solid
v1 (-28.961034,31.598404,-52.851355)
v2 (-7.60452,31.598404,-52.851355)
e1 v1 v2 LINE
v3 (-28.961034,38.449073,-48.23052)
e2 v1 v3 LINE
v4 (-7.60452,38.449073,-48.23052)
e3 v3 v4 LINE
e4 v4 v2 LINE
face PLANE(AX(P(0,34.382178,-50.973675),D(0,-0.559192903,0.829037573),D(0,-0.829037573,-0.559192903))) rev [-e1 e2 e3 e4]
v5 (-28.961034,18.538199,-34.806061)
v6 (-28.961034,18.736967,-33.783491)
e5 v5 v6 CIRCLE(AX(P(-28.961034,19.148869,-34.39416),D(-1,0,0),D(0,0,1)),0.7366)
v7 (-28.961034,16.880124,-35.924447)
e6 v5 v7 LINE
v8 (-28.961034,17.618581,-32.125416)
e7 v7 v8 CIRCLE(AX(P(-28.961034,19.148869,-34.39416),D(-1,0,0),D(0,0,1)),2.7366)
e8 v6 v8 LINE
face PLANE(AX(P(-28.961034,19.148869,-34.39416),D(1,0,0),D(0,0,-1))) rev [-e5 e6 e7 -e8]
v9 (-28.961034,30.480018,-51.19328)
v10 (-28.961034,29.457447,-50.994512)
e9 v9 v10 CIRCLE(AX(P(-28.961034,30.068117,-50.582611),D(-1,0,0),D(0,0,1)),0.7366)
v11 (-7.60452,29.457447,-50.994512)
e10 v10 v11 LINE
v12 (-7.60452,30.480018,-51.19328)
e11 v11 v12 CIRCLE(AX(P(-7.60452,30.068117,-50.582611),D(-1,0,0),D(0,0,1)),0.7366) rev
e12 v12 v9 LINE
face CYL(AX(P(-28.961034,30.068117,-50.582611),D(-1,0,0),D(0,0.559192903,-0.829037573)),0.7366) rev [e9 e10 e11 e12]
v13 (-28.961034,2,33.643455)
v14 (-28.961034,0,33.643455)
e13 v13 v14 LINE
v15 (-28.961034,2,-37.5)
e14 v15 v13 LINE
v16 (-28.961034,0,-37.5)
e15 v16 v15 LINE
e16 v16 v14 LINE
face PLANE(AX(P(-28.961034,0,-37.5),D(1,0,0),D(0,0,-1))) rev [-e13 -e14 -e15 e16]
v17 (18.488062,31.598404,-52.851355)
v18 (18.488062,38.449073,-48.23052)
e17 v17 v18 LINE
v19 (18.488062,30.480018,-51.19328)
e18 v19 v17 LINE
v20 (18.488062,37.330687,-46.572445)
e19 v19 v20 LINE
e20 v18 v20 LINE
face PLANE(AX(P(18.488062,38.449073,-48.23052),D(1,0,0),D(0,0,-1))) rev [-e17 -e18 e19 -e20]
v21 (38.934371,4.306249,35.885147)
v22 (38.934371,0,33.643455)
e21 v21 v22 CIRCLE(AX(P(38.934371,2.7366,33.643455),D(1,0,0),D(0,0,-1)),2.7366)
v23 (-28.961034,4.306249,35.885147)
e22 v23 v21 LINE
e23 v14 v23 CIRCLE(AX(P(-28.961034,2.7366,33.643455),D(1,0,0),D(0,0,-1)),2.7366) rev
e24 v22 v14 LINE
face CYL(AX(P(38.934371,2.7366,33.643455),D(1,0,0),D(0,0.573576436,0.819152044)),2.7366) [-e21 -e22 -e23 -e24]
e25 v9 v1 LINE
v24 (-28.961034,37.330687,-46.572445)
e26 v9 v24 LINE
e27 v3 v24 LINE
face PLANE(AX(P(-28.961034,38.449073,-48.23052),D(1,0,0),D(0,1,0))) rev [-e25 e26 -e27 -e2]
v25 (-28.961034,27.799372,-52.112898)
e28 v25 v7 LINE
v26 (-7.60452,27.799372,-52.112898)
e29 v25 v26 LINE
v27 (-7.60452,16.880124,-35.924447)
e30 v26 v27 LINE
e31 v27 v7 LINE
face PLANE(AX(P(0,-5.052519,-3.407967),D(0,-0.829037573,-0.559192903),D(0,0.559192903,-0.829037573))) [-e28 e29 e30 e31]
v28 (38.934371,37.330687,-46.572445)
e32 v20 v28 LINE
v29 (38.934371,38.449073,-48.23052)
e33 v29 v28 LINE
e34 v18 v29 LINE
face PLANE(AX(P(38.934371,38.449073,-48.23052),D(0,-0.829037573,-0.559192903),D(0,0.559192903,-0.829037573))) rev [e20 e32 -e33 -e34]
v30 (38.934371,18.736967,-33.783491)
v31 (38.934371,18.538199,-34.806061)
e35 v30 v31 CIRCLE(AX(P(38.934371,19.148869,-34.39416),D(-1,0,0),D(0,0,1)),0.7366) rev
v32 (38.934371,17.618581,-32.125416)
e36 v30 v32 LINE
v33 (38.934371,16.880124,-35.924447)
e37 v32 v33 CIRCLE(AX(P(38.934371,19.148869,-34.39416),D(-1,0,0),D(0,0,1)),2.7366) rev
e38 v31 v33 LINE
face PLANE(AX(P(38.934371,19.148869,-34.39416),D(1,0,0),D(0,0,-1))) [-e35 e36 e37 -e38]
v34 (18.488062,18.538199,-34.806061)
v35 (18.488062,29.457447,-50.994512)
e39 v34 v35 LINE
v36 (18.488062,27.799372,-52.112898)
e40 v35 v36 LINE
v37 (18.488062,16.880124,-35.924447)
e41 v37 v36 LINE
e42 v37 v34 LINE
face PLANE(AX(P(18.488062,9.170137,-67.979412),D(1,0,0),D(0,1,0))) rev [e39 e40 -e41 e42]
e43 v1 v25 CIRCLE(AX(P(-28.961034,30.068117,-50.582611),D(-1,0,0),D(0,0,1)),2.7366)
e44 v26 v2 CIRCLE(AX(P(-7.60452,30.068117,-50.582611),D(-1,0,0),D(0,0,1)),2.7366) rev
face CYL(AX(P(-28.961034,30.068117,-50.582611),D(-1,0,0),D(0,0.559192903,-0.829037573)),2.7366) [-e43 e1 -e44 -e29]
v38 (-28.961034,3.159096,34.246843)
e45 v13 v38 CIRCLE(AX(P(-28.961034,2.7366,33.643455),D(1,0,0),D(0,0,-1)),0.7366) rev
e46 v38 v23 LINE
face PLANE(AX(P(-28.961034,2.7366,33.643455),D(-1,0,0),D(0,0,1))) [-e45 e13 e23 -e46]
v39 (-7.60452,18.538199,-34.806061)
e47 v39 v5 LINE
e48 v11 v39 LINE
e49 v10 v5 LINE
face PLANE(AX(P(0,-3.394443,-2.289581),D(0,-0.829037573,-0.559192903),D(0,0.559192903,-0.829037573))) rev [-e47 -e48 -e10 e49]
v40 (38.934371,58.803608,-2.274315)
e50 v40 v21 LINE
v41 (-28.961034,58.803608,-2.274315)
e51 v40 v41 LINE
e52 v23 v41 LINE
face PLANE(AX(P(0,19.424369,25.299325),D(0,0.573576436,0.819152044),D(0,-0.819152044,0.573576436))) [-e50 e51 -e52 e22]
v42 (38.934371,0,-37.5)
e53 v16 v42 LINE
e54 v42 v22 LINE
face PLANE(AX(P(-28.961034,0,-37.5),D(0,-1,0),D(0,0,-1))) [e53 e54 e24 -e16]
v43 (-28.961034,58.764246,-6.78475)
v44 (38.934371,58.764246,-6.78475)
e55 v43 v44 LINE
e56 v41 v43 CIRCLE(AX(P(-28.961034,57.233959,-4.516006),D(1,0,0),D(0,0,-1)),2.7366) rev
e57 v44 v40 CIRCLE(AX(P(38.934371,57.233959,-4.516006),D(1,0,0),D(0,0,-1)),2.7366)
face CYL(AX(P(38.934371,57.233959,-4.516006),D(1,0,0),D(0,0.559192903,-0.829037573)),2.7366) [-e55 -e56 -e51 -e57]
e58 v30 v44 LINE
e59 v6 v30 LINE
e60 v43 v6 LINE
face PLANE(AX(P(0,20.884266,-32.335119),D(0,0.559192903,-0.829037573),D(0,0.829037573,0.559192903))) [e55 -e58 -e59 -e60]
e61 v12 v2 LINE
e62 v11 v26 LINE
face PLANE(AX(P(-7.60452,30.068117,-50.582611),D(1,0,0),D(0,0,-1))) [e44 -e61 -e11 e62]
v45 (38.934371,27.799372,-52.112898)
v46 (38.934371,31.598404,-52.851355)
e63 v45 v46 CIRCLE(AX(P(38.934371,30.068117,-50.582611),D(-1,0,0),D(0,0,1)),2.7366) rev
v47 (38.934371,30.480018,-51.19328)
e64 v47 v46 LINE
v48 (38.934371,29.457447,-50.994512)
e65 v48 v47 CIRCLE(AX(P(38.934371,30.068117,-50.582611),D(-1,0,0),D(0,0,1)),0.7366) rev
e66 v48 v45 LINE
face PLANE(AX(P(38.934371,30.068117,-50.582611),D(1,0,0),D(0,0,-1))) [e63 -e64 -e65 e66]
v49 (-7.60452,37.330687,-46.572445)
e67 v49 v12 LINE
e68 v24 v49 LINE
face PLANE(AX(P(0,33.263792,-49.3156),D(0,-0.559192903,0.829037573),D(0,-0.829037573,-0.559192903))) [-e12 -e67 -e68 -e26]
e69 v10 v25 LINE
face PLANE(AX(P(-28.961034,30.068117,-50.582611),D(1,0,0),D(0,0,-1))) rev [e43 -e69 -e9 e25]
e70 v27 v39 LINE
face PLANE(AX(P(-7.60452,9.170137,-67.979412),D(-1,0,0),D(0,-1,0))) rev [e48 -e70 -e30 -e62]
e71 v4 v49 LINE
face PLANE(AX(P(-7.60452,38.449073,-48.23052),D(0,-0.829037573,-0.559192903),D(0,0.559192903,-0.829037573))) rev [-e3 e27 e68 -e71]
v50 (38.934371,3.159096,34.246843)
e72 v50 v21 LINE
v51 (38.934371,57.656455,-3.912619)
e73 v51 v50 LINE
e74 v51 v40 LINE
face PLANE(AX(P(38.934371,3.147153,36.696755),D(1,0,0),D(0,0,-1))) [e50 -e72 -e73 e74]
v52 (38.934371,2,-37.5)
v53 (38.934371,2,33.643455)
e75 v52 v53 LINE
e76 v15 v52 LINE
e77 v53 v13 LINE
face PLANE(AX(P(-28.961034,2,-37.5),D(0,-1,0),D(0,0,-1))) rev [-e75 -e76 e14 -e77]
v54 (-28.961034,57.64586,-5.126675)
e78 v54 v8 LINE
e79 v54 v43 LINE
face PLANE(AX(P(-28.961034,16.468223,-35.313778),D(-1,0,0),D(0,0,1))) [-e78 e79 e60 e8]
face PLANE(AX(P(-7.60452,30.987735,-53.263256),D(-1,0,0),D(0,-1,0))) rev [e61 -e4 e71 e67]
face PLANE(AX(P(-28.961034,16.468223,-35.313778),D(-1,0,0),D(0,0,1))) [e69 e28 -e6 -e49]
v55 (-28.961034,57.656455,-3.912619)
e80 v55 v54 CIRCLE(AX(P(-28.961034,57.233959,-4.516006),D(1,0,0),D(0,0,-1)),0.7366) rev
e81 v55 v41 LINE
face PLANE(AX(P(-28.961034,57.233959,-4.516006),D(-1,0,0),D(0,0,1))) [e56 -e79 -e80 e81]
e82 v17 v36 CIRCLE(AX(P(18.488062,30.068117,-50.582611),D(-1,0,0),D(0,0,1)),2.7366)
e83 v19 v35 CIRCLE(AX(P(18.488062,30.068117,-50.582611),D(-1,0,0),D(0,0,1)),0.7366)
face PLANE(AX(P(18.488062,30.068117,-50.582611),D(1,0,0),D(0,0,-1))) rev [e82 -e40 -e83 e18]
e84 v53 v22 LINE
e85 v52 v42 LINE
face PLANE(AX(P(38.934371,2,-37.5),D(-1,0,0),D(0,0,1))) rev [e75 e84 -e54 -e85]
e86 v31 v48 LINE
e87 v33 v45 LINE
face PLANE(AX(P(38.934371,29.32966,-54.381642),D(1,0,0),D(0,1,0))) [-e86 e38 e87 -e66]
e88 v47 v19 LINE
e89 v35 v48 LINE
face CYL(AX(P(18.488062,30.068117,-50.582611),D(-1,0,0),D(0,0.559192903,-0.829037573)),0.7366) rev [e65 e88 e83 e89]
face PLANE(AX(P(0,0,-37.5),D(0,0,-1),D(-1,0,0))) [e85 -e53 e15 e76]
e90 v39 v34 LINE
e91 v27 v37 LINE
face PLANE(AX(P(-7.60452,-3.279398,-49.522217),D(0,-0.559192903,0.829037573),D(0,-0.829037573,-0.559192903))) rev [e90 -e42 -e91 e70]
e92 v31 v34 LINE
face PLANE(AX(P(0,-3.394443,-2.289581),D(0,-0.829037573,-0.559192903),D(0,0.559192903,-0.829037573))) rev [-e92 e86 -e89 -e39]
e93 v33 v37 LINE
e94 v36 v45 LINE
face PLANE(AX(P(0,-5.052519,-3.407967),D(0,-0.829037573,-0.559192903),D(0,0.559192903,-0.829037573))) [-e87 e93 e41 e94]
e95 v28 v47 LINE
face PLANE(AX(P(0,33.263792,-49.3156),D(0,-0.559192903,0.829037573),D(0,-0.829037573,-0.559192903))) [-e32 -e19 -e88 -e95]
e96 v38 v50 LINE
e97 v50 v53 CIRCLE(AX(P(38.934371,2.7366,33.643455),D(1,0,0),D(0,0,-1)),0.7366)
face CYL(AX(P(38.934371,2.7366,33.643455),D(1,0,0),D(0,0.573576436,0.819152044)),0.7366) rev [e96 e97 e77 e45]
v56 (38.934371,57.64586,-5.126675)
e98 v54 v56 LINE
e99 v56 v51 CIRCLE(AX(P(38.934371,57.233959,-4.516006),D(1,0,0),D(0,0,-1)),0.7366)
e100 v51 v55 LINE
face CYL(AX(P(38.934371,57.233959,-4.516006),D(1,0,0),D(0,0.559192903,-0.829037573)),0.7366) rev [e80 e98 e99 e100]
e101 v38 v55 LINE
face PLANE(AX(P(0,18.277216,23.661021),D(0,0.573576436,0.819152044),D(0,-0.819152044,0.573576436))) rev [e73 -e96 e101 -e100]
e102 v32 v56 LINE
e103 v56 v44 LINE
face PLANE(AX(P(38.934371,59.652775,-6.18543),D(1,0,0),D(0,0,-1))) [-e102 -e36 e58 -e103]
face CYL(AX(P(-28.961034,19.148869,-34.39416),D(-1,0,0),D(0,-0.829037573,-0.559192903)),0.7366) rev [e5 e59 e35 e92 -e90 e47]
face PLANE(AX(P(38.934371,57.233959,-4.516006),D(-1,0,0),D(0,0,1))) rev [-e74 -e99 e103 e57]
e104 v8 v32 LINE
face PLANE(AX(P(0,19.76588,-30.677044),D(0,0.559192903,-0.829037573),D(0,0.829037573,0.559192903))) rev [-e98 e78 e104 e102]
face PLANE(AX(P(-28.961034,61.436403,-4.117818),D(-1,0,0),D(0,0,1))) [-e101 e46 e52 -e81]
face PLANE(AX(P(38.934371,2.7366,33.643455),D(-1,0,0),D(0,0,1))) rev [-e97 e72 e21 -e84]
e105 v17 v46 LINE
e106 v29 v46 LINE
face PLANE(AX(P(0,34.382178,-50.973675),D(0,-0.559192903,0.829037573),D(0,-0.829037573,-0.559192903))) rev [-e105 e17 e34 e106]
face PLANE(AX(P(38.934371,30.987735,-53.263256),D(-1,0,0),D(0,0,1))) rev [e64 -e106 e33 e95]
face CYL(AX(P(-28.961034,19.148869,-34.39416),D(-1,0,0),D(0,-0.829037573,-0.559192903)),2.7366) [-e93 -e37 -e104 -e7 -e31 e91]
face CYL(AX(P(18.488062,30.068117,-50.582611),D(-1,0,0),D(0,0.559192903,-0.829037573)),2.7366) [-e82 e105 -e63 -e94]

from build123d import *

# Parameters (mm, degrees)
SKETCH1_W                      = 67.895404789
SKETCH1_H                      = 2
BASE_FLANGE1_DEPTH             = 37.5
EDGE_FLANGE1_START             = -28.961034246
EDGE_FLANGE1_DEPTH             = 67.895404789
EDGE_FLANGE1_2_DEPTH           = 67.895404789
EDGE_FLANGE2_START             = -28.961034246
EDGE_FLANGE2_DEPTH             = 67.895404789
EDGE_FLANGE2_2_DEPTH           = 67.895404789
EDGE_FLANGE3_STRIP_W           = 9.4732
EDGE_FLANGE3_STRIP_H           = 2
EDGE_FLANGE3_STRIP_CUT_DEPTH   = 67.89540479
EDGE_FLANGE3_DEPTH             = 67.89540479
CUT_EXTRUDE1_REACH             = 92.8
SKETCH15_W                     = 26.092581692
SKETCH15_H                     = 22.2634
EDGE_FLANGE4_STRIP_W           = 9.4732
EDGE_FLANGE4_STRIP_H           = 2
EDGE_FLANGE4_STRIP_CUT_DEPTH   = 20.44630838
EDGE_FLANGE4_STRIP_2_W         = 9.4732
EDGE_FLANGE4_STRIP_2_H         = 2
EDGE_FLANGE4_STRIP_CUT_2_DEPTH = 21.356514718
EDGE_FLANGE4_DEPTH             = 20.44630838
EDGE_FLANGE4_BEND_DEPTH        = 21.356514718


# Read off the part's stored shape, not the designer's step: Edge-Flange1, Edge-Flange2
# Sheet-metal steps are written as plain solids
with BuildPart() as part:
    # Sketch1 → Base-Flange1 (new, symmetric)
    with BuildSketch(Plane.XY):
        with Locations((4.986668148, 1)):
            Rectangle(SKETCH1_W, SKETCH1_H)
    extrude(amount=BASE_FLANGE1_DEPTH, both=True)

    # Edge-Flange1 outline → Edge-Flange1 (cut)
    with BuildSketch(Plane.YZ.offset(EDGE_FLANGE1_START)):
        with BuildLine():
            ThreePointArc((0, 33.643455388), (0.556604688, 35.297722597), (2, 36.279057786))
            Line((2, 36.279057786), (2, 37.5))
            Line((2, 37.5), (0, 37.5))
            Line((0, 37.5), (0, 33.643455388))
        make_face()
    extrude(amount=EDGE_FLANGE1_DEPTH, mode=Mode.SUBTRACT)

    # Edge-Flange1 2 outline → Edge-Flange1 2 (add)
    with BuildSketch(Plane.YZ.offset(EDGE_FLANGE1_START)):
        with BuildLine():
            Line((61.436403322, -4.11781765), (4.306249276, 35.885146872))
            ThreePointArc((4.306249276, 35.885146872), (3.197343124, 36.340990436), (2, 36.279057786))
            Line((2, 36.279057786), (2, 33.643455388))
            ThreePointArc((2, 33.643455388), (2.396475972, 34.296827567), (3.159096403, 34.246842784))
            Line((3.159096403, 34.246842784), (60.289250449, -5.756121738))
            Line((60.289250449, -5.756121738), (61.436403322, -4.11781765))
        make_face()
    extrude(amount=EDGE_FLANGE1_2_DEPTH)

    # Edge-Flange2 outline → Edge-Flange2 (cut)
    with BuildSketch(Plane.YZ.offset(EDGE_FLANGE2_START)):
        with BuildLine():
            ThreePointArc((58.80360799, -2.274314512), (59.839449023, -3.679107071), (59.81541421, -5.424338031))
            Line((59.81541421, -5.424338031), (60.289250449, -5.756121738))
            Line((60.289250449, -5.756121738), (61.436403322, -4.11781765))
            Line((61.436403322, -4.11781765), (58.80360799, -2.274314512))
        make_face()
    extrude(amount=EDGE_FLANGE2_DEPTH, mode=Mode.SUBTRACT)

    # Edge-Flange2 2 outline → Edge-Flange2 2 (add)
    with BuildSketch(Plane.YZ.offset(EDGE_FLANGE2_START)):
        with BuildLine():
            Line((16.468222849, -35.313778071), (58.764246014, -6.784750218))
            ThreePointArc((58.764246014, -6.784750218), (59.399434997, -6.189234023), (59.81541421, -5.424338031))
            Line((59.81541421, -5.424338031), (57.656455118, -3.912618601))
            ThreePointArc((57.656455118, -3.912618601), (57.970530667, -4.522433963), (57.645860207, -5.126675073))
            Line((57.645860207, -5.126675073), (15.349837042, -33.655702926))
            Line((15.349837042, -33.655702926), (16.468222849, -35.313778071))
        make_face()
    extrude(amount=EDGE_FLANGE2_2_DEPTH)

    # Edge-Flange3 strip (across the edge) → Edge-Flange3 strip cut (cut)
    with BuildSketch(Plane(origin=(38.934370543, 16.468222849, -35.313778071), x_dir=(0, 0.829037572555041, 0.5591929034707481), z_dir=(-1, 0, 0))):
        with Locations((-2, -1)):
            Rectangle(EDGE_FLANGE3_STRIP_W, EDGE_FLANGE3_STRIP_H)
    extrude(amount=EDGE_FLANGE3_STRIP_CUT_DEPTH, mode=Mode.SUBTRACT)

    # Edge-Flange3 section (across the edge) → Edge-Flange3 (add)
    with BuildSketch(Plane(origin=(38.934370543, 16.468222849, -35.313778071), x_dir=(0, 0.829037572555041, 0.5591929034707481), z_dir=(-1, 0, 0))):
        with BuildLine():
            Line((0, 0.7366), (0, 23))
            Line((0, 23), (2, 23))
            Line((2, 23), (2, 0.7366))
            ThreePointArc((2, 0.7366), (2.215745145, 0.215745145), (2.7366, 0))
            Line((2.7366, 0), (2.7366, -2))
            ThreePointArc((2.7366, -2), (0.801531583, -1.198468417), (0, 0.7366))
        make_face()
    extrude(amount=EDGE_FLANGE3_DEPTH)

    # Sketch15 → Cut-Extrude1 (cut, up to next)
    with BuildSketch(Plane(origin=(0, -3.394443435, -2.289581007), x_dir=(1, 0, 0), z_dir=(0, 0.8290375725550408, 0.559192903470748)), mode=Mode.PRIVATE) as cut_extrude1_sk1:
        with Locations((5.441771317, 50.3536622)):
            Rectangle(SKETCH15_W, SKETCH15_H)
    cut_extrude1_tool1 = extrude(cut_extrude1_sk1.sketch, amount=-CUT_EXTRUDE1_REACH, mode=Mode.PRIVATE) & part.part
    add(cut_extrude1_tool1.solids().sort_by_distance((5.441771, 24.762967, -44.034659))[0], mode=Mode.SUBTRACT)

    # Edge-Flange4 strip (across the edge) → Edge-Flange4 strip cut (cut)
    with BuildSketch(Plane(origin=(38.934370543, 30.987734774, -53.263256433), x_dir=(0, -0.5591929034707451, 0.8290375725550428), z_dir=(-1, 0, 0))):
        with Locations((-2, -1)):
            Rectangle(EDGE_FLANGE4_STRIP_W, EDGE_FLANGE4_STRIP_H)
    extrude(amount=EDGE_FLANGE4_STRIP_CUT_DEPTH, mode=Mode.SUBTRACT)

    # Edge-Flange4 strip 2 (across the edge) → Edge-Flange4 strip cut 2 (cut)
    with BuildSketch(Plane(origin=(-7.604519529, 30.987734774, -53.263256433), x_dir=(0, -0.5591929034707451, 0.8290375725550428), z_dir=(-1, 0, 0))):
        with Locations((-2, -1)):
            Rectangle(EDGE_FLANGE4_STRIP_2_W, EDGE_FLANGE4_STRIP_2_H)
    extrude(amount=EDGE_FLANGE4_STRIP_CUT_2_DEPTH, mode=Mode.SUBTRACT)

    # Edge-Flange4 section (across the edge) → Edge-Flange4 (add)
    with BuildSketch(Plane(origin=(38.934370543, 30.987734774, -53.263256433), x_dir=(0, -0.5591929034707451, 0.8290375725550428), z_dir=(-1, 0, 0))):
        with BuildLine():
            Line((0, 0.7366), (0, 9))
            Line((0, 9), (2, 9))
            Line((2, 9), (2, 0.7366))
            ThreePointArc((2, 0.7366), (2.215745145, 0.215745145), (2.7366, 0))
            Line((2.7366, 0), (2.7366, -2))
            ThreePointArc((2.7366, -2), (0.801531583, -1.198468417), (0, 0.7366))
        make_face()
    extrude(amount=EDGE_FLANGE4_DEPTH)

    # Edge-Flange4 section 2 (across the edge) → Edge-Flange4 bend (add)
    with BuildSketch(Plane(origin=(-7.604519529, 30.987734774, -53.263256433), x_dir=(0, -0.5591929034707451, 0.8290375725550428), z_dir=(-1, 0, 0))):
        with BuildLine():
            Line((0, 0.7366), (0, 9))
            Line((0, 9), (2, 9))
            Line((2, 9), (2, 0.7366))
            ThreePointArc((2, 0.7366), (2.215745145, 0.215745145), (2.7366, 0))
            Line((2.7366, 0), (2.7366, -2))
            ThreePointArc((2.7366, -2), (0.801531583, -1.198468417), (0, 0.7366))
        make_face()
    extrude(amount=EDGE_FLANGE4_BEND_DEPTH)


solid = part.part
